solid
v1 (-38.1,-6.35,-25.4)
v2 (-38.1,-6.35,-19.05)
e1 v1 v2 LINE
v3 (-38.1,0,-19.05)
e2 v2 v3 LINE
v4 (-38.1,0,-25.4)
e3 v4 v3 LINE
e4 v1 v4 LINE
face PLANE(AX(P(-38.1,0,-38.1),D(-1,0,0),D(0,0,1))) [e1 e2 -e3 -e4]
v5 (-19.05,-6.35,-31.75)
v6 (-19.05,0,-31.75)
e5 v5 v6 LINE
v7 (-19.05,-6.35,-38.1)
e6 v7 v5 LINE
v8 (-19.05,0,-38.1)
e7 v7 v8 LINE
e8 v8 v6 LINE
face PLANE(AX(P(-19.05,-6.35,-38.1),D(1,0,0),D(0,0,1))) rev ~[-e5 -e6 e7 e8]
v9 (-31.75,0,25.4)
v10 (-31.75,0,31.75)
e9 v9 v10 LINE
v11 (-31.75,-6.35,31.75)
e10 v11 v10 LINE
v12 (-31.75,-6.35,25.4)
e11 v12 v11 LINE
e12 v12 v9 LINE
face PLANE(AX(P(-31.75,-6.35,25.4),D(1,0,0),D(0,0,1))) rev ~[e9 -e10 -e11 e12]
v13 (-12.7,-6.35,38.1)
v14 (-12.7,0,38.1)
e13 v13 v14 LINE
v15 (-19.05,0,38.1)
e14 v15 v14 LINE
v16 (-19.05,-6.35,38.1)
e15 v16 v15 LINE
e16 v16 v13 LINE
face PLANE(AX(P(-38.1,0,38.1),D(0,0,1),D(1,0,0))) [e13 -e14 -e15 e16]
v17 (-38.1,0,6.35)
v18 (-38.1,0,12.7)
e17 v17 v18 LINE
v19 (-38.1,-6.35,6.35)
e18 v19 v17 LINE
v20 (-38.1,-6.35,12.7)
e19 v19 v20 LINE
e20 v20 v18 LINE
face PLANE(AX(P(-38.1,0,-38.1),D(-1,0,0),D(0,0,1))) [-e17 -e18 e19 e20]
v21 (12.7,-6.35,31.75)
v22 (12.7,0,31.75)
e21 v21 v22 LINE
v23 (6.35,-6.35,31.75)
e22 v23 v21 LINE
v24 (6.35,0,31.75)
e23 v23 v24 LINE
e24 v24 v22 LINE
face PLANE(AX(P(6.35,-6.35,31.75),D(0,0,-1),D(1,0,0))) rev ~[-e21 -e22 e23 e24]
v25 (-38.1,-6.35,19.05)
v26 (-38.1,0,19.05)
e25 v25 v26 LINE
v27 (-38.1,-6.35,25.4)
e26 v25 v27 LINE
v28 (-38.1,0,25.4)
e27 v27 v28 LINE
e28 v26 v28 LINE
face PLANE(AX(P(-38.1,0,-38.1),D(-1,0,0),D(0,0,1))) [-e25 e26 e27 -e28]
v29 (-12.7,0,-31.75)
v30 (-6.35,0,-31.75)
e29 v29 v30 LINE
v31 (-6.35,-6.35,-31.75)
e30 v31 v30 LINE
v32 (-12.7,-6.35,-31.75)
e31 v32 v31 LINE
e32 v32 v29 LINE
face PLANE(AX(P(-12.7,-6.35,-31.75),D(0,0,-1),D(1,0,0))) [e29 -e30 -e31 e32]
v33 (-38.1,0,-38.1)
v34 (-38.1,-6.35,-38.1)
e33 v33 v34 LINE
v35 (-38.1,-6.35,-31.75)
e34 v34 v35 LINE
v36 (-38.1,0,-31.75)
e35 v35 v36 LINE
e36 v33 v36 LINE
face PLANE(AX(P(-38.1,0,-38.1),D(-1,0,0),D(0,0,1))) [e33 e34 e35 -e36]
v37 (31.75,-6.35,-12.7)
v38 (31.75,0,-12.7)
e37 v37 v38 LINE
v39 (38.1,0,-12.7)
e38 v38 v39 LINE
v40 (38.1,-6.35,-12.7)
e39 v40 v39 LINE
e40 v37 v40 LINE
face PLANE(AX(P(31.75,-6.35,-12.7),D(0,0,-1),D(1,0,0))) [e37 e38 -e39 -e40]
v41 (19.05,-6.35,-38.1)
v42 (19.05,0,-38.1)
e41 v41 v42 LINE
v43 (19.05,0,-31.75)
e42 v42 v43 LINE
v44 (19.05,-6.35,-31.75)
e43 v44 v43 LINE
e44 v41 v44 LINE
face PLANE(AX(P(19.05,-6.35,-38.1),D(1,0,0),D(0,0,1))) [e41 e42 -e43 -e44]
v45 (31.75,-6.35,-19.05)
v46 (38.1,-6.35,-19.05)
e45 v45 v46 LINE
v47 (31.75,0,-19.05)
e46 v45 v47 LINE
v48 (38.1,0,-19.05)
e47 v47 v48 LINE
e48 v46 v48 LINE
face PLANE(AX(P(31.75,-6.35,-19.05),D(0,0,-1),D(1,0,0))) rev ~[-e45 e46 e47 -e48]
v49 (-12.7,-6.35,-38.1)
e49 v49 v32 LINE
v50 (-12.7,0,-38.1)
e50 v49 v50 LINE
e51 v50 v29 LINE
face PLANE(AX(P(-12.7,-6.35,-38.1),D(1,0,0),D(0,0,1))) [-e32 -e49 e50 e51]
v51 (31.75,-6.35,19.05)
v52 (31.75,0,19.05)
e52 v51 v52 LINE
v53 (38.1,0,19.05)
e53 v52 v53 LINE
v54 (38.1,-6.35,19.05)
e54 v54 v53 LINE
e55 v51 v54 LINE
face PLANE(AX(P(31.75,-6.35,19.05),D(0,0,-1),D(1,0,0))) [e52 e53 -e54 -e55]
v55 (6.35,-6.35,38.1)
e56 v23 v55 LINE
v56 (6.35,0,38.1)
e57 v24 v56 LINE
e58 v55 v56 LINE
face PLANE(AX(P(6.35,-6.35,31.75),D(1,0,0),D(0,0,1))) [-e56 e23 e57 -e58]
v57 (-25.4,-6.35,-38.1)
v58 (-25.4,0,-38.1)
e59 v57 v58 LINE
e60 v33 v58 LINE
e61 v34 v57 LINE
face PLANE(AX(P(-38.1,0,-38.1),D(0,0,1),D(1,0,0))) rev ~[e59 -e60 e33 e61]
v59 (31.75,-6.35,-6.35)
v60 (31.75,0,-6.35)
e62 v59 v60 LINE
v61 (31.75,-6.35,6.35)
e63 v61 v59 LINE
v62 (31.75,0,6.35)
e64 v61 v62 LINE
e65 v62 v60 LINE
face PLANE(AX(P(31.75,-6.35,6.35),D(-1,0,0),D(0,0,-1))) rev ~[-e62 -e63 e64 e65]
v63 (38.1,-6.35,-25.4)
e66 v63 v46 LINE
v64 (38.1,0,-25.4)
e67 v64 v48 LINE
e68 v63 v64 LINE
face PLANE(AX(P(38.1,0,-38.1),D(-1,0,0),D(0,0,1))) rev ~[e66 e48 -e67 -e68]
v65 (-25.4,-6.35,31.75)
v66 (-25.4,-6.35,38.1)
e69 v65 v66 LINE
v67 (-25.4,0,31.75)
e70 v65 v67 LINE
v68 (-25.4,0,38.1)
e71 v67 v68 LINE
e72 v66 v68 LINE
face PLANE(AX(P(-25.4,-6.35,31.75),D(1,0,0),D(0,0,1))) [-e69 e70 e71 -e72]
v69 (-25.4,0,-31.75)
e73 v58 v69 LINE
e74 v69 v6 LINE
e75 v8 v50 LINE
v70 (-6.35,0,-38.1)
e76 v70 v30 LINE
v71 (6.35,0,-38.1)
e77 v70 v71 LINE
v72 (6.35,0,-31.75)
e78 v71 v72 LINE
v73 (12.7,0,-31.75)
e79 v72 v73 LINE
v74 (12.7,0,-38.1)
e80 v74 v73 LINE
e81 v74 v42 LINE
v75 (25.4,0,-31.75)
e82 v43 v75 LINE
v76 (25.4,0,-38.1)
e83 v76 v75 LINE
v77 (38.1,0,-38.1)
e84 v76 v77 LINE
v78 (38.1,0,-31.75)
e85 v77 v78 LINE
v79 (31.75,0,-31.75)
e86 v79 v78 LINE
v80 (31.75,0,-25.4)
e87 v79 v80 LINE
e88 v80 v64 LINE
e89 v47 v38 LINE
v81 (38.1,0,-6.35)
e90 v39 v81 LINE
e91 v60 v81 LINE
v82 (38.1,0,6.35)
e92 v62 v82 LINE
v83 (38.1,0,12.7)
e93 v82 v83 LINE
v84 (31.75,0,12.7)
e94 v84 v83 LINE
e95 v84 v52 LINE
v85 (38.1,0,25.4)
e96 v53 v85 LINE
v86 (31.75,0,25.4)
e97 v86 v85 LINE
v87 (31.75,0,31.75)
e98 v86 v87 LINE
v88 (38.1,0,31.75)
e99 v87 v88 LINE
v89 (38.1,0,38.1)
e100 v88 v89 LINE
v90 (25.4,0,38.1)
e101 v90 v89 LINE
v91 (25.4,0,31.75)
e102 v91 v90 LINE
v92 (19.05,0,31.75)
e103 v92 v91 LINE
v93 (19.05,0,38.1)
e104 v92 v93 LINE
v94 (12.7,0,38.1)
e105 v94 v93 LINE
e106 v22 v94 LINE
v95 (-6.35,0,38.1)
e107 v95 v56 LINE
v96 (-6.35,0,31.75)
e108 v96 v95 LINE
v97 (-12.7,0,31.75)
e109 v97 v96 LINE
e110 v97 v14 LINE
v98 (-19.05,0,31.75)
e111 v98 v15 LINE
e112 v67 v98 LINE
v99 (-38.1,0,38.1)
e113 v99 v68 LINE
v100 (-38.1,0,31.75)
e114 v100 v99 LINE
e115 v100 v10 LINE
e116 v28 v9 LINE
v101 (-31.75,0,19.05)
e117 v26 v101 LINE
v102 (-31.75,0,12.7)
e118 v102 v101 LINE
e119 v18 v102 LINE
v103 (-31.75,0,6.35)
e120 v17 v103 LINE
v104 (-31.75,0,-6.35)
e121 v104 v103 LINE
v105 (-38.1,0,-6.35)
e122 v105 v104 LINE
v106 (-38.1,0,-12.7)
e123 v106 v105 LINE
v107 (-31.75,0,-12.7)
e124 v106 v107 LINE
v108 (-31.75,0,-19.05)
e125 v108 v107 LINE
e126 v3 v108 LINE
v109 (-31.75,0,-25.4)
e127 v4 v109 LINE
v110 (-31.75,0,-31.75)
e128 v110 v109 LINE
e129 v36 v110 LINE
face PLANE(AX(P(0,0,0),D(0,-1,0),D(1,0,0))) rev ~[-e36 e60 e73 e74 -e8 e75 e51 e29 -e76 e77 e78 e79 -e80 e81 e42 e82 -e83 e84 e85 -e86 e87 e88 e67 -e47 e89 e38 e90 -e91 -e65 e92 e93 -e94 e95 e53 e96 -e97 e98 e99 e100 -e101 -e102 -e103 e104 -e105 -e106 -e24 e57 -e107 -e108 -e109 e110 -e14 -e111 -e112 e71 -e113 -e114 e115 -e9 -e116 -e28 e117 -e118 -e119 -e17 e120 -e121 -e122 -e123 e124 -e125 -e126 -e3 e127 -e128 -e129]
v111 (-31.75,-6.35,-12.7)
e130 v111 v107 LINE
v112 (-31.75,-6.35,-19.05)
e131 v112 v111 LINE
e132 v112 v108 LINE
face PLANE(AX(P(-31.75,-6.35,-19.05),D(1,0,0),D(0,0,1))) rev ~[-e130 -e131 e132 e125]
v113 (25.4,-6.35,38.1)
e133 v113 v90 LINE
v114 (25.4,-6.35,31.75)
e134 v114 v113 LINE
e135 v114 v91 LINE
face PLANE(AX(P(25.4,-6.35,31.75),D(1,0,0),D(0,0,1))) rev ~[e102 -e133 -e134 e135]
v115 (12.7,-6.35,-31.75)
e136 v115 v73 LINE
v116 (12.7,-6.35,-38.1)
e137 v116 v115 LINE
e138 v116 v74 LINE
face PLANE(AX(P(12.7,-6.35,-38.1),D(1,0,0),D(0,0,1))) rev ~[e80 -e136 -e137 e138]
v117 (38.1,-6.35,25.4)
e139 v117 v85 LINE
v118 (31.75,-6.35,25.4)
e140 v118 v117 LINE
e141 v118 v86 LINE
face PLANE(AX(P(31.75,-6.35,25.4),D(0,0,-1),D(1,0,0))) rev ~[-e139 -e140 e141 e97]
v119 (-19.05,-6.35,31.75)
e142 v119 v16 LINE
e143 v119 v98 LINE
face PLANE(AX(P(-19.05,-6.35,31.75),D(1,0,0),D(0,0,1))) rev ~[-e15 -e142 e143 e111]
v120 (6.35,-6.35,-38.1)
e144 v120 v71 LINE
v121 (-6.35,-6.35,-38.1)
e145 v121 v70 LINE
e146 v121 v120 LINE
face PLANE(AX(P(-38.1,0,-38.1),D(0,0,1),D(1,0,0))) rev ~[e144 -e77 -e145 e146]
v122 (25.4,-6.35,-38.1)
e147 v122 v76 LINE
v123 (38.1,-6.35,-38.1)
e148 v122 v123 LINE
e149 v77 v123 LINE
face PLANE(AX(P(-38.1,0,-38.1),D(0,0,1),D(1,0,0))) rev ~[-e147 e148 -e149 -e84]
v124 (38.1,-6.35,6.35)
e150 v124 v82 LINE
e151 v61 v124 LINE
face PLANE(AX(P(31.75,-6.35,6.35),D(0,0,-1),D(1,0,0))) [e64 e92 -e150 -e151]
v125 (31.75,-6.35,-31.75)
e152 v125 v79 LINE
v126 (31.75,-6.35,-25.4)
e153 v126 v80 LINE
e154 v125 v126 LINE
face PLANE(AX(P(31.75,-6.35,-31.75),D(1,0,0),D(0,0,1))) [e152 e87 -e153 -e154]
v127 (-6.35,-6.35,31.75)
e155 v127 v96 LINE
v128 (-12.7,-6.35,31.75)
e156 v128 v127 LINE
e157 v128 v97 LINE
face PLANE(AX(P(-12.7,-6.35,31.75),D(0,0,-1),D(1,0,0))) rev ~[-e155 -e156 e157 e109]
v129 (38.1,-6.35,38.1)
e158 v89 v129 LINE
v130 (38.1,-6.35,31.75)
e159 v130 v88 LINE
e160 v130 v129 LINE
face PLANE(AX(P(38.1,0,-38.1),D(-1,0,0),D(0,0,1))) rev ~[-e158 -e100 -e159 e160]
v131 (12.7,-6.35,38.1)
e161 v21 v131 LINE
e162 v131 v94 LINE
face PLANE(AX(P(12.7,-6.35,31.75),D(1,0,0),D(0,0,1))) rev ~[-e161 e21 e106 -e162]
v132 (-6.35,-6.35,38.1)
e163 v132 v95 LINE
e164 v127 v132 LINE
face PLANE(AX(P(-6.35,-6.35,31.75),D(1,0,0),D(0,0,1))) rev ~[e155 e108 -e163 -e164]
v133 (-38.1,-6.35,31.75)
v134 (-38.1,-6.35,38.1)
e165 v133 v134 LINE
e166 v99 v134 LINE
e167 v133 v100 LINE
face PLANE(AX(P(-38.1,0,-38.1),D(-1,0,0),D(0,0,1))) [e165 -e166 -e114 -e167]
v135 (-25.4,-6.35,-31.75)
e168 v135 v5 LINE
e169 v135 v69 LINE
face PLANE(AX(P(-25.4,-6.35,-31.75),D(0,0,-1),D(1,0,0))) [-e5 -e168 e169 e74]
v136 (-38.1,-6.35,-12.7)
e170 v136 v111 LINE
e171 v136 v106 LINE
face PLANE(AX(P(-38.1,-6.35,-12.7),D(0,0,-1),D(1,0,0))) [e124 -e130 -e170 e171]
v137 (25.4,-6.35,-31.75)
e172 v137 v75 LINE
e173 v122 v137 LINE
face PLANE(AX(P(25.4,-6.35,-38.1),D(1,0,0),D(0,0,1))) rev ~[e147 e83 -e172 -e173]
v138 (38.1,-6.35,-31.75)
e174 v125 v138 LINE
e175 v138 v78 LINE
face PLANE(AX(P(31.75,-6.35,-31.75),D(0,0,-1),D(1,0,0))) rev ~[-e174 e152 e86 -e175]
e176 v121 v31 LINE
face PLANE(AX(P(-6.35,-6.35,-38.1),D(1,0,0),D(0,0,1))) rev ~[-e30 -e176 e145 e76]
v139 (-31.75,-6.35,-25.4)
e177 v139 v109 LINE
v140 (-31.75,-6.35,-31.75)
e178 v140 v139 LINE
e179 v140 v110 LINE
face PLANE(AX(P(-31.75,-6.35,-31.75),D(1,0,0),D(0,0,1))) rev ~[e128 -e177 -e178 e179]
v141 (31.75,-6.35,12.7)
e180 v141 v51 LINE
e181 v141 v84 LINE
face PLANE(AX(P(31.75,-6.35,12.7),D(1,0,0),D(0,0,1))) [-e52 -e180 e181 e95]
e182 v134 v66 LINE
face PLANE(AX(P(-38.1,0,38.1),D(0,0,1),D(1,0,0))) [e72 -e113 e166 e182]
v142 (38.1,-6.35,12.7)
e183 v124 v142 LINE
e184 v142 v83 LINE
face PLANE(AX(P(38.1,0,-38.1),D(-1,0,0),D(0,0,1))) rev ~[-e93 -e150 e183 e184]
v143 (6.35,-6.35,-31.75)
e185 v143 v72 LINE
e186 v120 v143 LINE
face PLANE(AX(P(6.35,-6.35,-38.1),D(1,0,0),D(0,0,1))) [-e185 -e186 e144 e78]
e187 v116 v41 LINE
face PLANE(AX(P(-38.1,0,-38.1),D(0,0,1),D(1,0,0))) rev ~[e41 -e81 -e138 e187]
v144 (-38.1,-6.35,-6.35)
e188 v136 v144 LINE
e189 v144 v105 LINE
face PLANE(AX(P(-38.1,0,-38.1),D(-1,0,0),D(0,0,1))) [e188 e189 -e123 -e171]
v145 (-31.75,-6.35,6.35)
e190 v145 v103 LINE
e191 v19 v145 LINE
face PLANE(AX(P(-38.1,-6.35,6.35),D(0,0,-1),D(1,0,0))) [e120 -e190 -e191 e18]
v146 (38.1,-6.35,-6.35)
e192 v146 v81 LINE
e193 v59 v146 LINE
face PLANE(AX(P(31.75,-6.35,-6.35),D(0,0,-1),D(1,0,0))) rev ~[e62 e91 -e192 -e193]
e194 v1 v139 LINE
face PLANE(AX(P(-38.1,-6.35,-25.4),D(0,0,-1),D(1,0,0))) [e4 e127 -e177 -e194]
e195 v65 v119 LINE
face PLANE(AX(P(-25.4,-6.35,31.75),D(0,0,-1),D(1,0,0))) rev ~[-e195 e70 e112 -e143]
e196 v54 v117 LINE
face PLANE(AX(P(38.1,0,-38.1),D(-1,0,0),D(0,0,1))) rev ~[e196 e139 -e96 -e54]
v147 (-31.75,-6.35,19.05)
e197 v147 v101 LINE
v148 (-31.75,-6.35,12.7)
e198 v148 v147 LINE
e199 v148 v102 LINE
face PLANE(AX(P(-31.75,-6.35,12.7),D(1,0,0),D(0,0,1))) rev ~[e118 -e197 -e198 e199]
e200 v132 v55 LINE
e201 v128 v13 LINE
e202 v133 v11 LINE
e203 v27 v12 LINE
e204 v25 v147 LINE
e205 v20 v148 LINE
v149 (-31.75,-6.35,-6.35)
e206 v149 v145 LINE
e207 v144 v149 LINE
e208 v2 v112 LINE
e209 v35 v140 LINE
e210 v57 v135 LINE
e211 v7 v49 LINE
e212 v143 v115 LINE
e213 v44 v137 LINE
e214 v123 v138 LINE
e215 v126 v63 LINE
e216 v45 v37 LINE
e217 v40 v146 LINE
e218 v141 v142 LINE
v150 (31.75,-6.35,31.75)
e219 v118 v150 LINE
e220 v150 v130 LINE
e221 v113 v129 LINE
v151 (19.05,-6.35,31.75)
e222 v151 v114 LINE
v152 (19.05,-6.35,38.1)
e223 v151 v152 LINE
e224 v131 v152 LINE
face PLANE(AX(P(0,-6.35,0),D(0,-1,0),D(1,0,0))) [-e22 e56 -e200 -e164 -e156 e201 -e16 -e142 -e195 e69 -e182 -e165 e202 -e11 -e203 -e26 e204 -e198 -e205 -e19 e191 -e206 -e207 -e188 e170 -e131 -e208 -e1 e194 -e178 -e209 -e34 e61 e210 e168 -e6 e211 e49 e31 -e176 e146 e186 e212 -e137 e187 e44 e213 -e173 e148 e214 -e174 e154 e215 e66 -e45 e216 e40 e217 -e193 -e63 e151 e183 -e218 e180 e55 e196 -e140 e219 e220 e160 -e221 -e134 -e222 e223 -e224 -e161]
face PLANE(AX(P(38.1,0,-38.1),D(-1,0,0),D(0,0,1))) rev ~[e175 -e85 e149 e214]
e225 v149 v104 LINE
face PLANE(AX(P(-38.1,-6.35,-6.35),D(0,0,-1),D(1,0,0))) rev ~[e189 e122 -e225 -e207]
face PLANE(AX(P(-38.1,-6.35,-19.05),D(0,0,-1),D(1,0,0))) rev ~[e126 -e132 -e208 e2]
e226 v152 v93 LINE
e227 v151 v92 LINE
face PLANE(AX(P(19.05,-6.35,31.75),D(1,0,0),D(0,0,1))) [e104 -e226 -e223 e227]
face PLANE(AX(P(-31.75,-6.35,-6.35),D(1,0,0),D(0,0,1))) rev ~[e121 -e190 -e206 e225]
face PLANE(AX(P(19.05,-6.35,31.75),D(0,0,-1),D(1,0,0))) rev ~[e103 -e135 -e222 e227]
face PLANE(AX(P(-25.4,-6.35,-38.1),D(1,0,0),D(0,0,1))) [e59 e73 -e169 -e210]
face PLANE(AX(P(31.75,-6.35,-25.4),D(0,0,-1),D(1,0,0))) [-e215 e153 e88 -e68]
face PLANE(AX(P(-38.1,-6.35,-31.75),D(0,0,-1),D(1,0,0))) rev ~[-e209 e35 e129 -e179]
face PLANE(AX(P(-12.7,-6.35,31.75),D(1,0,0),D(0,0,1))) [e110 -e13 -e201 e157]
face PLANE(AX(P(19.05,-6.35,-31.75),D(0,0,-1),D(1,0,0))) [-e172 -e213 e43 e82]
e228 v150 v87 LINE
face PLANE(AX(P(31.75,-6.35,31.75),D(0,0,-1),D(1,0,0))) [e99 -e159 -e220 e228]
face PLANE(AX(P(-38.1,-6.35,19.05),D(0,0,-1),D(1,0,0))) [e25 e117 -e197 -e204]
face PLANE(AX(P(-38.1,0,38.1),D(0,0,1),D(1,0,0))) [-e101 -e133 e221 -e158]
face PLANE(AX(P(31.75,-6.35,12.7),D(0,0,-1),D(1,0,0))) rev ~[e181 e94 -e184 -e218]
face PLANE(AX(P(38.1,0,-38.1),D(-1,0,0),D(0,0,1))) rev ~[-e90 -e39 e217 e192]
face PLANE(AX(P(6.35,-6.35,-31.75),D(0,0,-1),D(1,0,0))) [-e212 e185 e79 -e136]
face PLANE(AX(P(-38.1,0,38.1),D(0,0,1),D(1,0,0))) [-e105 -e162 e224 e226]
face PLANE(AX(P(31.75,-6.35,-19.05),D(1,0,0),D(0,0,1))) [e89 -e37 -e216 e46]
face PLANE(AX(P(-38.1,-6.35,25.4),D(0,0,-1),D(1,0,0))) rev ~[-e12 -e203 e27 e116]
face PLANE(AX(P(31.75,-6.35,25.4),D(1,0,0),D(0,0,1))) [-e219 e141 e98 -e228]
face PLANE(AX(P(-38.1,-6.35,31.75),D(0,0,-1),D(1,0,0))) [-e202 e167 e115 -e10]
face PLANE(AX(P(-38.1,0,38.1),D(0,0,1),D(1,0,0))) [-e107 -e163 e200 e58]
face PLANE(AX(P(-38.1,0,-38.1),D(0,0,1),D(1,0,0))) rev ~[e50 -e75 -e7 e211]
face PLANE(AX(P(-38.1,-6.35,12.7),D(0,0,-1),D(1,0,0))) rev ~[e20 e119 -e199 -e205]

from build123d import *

# Parameters (mm, degrees)
F0_W     = 76.2
F0_H     = 76.2
F1_DEPTH = 6.35
F2_W     = 6.35
F2_H     = 6.35
F3_DEPTH = 6.351
F4_W     = 6.35
F4_H     = 6.35
F5_DEPTH = 6.351
F6_W     = 6.35
F6_H     = 6.35
F6_H_2   = 12.7
F7_DEPTH = 6.351


# Not quite as in the source:
# - a feature names something its author has since deleted; it is built from what else it names


with BuildPart() as f1:
    # F0 (on Front) → F1 (new body)
    with BuildSketch(Plane.XZ):
        Rectangle(F0_W, F0_H)
    extrude(amount=F1_DEPTH)

    # F2 (on face) → F3 (cut, through all)
    with BuildSketch(Plane.XZ.offset(6.35)):
        with Locations((-22.225, 34.925)):
            Rectangle(F2_W, F2_H)
        with Locations((-9.525, 34.925)):
            Rectangle(F2_W, F2_H)
        with Locations((9.525, 34.925)):
            Rectangle(F2_W, F2_H)
        with Locations((22.225, 34.925)):
            Rectangle(F2_W, F2_H)
    extrude(amount=-F3_DEPTH, mode=Mode.SUBTRACT)

    # F4 (on face) → F5 (cut, through all)
    with BuildSketch(Plane.XZ.offset(6.35)):
        with Locations((-9.525, -34.925)):
            Rectangle(F4_W, F4_H)
        with Locations((9.525, -34.925)):
            Rectangle(F4_W, F4_H)
        with Locations((22.225, -34.925)):
            Rectangle(F4_W, F4_H)
        with Locations((-22.225, -34.925)):
            Rectangle(F4_W, F4_H)
    extrude(amount=-F5_DEPTH, mode=Mode.SUBTRACT)

    # F6 (on face) → F7 (cut, through all)
    with BuildSketch(Plane.XZ.offset(6.35)):
        with Locations((-34.925, -28.575)):
            Rectangle(F6_W, F6_H)
        with Locations((-34.925, -15.875)):
            Rectangle(F6_W, F6_H)
        with Locations((-34.925, 0)):
            Rectangle(F6_W, F6_H_2)
        with Locations((-34.925, 15.875)):
            Rectangle(F6_W, F6_H)
        with Locations((-34.925, 28.575)):
            Rectangle(F6_W, F6_H)
        with Locations((34.925, -28.575)):
            Rectangle(F6_W, F6_H)
        with Locations((34.925, -15.875)):
            Rectangle(F6_W, F6_H)
        with Locations((34.925, -3.175)):
            Rectangle(F6_W, F6_H)
        with Locations((34.925, 3.175)):
            Rectangle(F6_W, F6_H)
        with Locations((34.925, 15.875)):
            Rectangle(F6_W, F6_H)
        with Locations((34.925, 28.575)):
            Rectangle(F6_W, F6_H)
    extrude(amount=-F7_DEPTH, mode=Mode.SUBTRACT)


solid = f1.part
